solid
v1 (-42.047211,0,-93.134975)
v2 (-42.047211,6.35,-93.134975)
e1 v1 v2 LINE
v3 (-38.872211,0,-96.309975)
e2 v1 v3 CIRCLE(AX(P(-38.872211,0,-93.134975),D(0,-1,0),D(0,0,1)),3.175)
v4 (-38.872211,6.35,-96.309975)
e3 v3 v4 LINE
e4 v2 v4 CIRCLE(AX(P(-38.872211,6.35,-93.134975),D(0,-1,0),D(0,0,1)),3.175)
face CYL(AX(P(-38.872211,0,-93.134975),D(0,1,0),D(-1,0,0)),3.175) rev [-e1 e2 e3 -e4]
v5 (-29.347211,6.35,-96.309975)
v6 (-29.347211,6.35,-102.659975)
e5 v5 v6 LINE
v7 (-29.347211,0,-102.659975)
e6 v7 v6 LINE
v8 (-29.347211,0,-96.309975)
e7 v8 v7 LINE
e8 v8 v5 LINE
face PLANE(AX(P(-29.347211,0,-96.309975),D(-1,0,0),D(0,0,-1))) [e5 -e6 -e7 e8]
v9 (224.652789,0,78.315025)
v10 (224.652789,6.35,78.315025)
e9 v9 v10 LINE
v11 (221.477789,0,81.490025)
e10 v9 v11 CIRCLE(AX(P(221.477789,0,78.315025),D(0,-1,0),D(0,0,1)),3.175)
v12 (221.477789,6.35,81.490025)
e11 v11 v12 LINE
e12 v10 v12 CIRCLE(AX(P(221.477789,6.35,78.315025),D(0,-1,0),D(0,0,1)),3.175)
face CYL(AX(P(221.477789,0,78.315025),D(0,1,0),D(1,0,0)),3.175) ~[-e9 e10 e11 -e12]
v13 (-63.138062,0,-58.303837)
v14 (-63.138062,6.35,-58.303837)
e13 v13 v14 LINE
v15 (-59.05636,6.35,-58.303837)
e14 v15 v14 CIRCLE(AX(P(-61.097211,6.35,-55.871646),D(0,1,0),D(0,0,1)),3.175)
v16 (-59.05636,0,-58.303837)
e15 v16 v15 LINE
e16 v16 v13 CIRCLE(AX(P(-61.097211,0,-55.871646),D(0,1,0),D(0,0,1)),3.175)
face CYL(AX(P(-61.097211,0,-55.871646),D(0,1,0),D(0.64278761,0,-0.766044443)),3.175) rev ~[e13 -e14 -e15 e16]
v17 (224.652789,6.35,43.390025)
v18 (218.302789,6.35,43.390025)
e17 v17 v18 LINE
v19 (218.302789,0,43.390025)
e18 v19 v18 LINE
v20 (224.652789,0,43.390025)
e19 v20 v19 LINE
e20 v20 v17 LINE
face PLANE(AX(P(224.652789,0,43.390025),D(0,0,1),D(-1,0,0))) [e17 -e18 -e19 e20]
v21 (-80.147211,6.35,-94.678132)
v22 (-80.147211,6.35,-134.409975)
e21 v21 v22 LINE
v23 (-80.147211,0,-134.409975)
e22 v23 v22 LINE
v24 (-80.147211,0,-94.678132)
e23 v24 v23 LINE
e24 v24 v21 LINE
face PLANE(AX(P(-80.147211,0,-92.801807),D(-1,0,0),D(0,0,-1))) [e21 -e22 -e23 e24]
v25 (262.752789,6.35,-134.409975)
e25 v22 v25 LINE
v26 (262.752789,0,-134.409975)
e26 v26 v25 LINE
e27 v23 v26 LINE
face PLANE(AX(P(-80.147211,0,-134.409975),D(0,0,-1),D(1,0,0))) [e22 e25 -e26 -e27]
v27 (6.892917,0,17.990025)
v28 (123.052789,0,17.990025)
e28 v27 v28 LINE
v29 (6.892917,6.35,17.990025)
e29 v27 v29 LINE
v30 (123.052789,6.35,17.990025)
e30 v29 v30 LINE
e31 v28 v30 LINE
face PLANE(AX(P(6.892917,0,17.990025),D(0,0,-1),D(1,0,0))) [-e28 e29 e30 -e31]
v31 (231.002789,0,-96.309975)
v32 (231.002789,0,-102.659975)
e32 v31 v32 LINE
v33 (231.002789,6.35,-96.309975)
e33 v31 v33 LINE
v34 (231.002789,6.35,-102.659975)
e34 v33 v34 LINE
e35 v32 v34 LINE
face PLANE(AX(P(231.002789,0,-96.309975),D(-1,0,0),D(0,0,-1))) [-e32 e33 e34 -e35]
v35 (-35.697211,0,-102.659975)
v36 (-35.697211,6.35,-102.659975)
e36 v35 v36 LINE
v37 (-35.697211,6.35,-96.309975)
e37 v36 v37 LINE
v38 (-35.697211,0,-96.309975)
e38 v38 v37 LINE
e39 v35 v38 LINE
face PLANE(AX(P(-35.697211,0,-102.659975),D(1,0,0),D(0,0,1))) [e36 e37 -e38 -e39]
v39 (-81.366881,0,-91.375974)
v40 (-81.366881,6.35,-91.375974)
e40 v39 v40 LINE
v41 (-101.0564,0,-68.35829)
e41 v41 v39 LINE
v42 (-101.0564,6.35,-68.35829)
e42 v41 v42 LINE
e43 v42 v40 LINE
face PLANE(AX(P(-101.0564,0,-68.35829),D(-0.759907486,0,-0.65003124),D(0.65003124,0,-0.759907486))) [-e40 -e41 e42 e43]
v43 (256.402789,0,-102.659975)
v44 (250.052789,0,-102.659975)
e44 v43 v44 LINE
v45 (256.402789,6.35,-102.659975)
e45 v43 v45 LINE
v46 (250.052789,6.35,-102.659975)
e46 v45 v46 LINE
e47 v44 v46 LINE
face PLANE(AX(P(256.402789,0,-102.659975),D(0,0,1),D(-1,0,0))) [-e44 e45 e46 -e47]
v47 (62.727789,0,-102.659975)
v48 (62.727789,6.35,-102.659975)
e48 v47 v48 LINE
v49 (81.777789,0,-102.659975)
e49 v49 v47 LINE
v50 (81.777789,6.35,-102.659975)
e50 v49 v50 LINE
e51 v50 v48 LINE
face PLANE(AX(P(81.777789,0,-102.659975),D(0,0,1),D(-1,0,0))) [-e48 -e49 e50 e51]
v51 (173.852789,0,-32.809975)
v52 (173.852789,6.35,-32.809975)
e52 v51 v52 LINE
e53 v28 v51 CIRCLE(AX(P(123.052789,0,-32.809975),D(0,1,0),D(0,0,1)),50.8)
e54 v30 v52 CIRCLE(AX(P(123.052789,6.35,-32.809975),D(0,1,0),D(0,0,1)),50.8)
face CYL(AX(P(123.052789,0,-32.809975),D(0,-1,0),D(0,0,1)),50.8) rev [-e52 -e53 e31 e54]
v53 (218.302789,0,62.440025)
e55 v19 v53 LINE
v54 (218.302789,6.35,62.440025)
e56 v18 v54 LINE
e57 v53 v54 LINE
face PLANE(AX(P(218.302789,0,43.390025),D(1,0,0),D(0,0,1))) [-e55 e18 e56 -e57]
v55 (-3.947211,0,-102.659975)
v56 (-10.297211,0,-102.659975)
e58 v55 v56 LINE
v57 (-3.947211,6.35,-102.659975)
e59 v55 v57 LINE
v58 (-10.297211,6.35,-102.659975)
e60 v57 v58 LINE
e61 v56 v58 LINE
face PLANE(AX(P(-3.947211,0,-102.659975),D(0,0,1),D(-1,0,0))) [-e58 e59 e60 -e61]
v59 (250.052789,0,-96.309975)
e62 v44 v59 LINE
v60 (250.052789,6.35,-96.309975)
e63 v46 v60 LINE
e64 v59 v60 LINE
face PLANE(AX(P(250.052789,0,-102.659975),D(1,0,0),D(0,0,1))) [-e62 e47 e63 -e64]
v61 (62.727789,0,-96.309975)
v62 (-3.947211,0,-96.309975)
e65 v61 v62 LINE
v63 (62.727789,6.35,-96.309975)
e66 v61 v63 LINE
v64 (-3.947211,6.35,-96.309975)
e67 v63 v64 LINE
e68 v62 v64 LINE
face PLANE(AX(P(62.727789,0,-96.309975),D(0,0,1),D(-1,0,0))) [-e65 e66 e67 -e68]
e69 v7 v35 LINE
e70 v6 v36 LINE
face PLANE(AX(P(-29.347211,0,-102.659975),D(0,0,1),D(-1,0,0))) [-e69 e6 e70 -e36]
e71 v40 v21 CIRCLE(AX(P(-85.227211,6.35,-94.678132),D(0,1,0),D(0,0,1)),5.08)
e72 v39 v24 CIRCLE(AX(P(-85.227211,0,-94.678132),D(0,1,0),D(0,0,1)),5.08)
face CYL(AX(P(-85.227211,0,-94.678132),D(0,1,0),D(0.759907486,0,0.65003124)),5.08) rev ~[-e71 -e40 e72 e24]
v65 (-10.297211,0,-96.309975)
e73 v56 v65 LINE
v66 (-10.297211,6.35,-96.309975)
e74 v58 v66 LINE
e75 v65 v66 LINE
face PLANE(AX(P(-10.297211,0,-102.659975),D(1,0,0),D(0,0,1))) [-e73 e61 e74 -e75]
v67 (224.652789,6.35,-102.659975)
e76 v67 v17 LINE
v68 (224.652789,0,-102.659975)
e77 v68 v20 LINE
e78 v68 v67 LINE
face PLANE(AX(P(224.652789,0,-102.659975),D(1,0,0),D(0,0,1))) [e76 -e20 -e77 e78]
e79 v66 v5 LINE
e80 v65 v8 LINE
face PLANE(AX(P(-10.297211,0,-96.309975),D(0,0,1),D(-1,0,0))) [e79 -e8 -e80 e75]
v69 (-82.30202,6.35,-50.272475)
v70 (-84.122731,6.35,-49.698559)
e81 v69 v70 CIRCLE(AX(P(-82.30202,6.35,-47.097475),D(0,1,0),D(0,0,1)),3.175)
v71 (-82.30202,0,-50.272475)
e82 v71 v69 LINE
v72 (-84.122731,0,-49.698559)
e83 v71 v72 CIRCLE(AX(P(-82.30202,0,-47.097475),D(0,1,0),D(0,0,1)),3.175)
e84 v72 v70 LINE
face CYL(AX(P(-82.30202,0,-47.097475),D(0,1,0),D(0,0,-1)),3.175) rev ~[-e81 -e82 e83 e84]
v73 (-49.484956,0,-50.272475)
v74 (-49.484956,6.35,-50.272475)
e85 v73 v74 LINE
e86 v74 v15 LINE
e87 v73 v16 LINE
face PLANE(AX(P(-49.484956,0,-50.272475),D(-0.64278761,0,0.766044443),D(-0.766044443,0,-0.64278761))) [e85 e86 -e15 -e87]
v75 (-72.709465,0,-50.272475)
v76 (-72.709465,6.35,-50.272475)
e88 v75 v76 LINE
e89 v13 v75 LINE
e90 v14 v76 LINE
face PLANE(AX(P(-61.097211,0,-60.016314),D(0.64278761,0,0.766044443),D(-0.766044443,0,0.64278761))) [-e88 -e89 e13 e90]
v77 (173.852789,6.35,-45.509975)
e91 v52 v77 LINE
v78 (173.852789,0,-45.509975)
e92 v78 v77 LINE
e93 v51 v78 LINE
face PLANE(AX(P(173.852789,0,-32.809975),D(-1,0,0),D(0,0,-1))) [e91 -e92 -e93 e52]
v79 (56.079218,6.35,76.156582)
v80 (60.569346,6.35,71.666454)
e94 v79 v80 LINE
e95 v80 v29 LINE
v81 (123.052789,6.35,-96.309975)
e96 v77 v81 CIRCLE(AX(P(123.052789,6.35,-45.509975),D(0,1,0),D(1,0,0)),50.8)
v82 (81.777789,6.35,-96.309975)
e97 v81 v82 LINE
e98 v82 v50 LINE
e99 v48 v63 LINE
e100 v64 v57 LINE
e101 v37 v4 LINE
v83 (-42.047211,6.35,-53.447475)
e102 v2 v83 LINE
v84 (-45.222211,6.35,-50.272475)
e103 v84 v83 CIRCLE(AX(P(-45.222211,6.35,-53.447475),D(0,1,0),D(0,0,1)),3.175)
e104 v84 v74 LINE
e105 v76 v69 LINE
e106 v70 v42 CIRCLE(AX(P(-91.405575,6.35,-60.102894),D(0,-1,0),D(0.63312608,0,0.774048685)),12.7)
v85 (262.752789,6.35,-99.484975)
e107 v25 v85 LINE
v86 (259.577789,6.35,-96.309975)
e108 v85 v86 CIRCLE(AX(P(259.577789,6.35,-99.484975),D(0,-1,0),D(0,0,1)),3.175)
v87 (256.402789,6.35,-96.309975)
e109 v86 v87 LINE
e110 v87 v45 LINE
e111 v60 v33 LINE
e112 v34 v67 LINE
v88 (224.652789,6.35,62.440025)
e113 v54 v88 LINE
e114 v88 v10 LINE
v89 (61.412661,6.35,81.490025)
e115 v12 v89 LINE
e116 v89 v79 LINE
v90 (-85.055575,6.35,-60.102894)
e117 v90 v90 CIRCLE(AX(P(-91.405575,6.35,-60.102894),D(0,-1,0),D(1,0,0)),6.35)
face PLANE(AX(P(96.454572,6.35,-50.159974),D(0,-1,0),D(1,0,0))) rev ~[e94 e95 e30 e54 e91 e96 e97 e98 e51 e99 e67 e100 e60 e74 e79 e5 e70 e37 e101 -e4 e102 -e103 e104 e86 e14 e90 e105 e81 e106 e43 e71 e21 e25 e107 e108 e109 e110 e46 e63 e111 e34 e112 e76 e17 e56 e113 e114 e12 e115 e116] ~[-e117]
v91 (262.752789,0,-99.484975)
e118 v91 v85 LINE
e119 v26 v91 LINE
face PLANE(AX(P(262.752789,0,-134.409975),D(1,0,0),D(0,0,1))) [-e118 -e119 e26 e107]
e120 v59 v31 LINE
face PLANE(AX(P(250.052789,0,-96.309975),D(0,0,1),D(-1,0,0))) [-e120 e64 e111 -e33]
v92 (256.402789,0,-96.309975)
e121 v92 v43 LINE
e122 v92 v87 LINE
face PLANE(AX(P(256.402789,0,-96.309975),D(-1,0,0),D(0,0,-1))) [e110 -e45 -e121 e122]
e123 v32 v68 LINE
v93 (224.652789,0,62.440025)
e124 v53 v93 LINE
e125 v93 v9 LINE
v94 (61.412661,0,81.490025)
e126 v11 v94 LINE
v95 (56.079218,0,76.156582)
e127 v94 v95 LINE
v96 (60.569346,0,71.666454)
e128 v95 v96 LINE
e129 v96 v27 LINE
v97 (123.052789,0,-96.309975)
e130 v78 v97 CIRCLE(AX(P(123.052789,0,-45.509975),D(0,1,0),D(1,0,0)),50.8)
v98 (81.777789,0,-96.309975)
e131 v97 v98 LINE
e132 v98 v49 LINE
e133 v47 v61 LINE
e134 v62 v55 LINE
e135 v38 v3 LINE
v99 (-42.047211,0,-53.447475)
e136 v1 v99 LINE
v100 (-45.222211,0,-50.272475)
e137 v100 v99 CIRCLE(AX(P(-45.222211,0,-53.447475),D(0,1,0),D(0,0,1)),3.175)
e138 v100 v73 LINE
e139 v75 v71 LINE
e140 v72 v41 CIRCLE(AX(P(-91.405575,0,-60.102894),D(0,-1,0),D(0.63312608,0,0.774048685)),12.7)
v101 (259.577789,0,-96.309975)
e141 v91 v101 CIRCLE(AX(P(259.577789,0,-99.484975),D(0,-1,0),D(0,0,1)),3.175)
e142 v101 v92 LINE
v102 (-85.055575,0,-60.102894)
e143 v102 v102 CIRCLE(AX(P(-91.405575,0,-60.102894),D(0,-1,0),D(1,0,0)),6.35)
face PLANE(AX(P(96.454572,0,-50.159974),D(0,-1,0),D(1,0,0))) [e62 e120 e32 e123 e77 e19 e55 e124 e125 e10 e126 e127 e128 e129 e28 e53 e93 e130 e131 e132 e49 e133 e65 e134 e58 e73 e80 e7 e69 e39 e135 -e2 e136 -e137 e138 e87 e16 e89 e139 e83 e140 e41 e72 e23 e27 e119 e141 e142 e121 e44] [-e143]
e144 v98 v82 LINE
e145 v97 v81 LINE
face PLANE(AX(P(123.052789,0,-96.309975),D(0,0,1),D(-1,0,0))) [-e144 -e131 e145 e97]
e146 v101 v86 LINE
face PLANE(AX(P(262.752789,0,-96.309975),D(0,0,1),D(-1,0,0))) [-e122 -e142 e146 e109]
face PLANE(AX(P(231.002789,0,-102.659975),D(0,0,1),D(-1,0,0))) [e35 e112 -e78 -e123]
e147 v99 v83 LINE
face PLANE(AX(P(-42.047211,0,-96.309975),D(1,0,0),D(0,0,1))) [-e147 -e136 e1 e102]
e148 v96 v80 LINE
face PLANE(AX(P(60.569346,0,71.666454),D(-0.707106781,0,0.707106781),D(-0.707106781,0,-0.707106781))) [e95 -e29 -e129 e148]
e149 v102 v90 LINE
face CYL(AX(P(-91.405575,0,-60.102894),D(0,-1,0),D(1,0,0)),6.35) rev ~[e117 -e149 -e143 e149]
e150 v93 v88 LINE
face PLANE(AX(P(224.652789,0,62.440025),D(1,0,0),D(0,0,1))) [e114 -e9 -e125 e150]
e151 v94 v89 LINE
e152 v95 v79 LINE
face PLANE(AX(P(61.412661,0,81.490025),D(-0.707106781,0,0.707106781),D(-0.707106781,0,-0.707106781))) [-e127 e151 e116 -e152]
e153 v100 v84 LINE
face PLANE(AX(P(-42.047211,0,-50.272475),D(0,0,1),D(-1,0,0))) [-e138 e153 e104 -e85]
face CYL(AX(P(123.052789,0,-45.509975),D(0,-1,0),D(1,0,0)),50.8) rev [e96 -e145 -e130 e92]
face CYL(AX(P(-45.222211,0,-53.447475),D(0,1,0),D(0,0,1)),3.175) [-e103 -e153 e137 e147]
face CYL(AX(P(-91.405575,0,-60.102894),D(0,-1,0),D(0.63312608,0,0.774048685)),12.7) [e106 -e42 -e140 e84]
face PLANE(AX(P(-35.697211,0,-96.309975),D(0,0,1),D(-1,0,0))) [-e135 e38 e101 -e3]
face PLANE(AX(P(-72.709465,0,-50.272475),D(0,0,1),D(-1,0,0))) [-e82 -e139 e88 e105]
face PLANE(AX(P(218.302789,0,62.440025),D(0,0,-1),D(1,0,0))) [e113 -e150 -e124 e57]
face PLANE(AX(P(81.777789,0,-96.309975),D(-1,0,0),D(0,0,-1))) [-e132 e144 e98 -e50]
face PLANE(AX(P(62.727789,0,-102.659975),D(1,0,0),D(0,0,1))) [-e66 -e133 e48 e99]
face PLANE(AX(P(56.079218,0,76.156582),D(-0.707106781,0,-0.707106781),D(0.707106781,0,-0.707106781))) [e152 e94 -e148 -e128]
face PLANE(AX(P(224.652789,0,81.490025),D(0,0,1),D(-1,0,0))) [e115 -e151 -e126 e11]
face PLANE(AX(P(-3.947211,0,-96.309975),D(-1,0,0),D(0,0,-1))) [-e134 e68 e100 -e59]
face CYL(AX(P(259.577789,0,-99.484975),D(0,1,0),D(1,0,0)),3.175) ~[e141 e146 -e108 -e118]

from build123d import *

# Parameters (mm, degrees)
F0_R     = 6.35
F1_DEPTH = 6.35
F2_R     = 3.175
F3_R     = 5.08
F4_R     = 3.175
F5_R     = 3.175


# Not quite as in the source:
# - ends of sketch curves that miss each other by under 0.0002 mm in the source are joined


with BuildPart() as f1:
    # F0 (on Front) → F1 (new body)
    with BuildSketch(Plane.XZ):
        with BuildLine():
            Line((-72.7094654823, -50.272475262), (-83.3648741359, -50.272475262))
            ThreePointArc((-83.3648741359, -50.272475262), (-100.4842470659, -51.222143603), (-101.056400417, -68.3582903151))
            Line((-101.056400417, -68.3582903151), (-80.147210941, -92.8018072064))
            Line((-80.147210941, -92.8018072064), (-80.147210941, -134.409975262))
            Line((-80.147210941, -134.409975262), (262.752789059, -134.409975262))
            Line((262.752789059, -134.409975262), (262.752789059, -96.309975262))
            Line((262.752789059, -96.309975262), (256.402789059, -96.309975262))
            Line((256.402789059, -96.309975262), (256.402789059, -102.659975262))
            Line((256.402789059, -102.659975262), (250.052789059, -102.659975262))
            Line((250.052789059, -102.659975262), (250.052789059, -96.309975262))
            Line((250.052789059, -96.309975262), (231.002789059, -96.309975262))
            Line((231.002789059, -96.309975262), (231.002789059, -102.659975262))
            Line((231.002789059, -102.659975262), (224.652789059, -102.659975262))
            Line((224.652789059, -102.659975262), (224.652789059, 43.390024738))
            Line((224.652789059, 43.390024738), (218.302789059, 43.390024738))
            Line((218.302789059, 43.390024738), (218.302789059, 62.440024738))
            Line((218.302789059, 62.440024738), (224.652789059, 62.440024738))
            Line((224.652789059, 62.440024738), (224.652789059, 81.490024738))
            Line((224.652789059, 81.490024738), (61.4126609984, 81.490024738))
            Line((61.4126609984, 81.490024738), (56.0792184251, 76.1565821646))
            Line((56.0792184251, 76.1565821646), (60.5693464856, 71.6664541041))
            Line((60.5693464856, 71.6664541041), (6.8929171195, 17.990024738))
            Line((6.8929171195, 17.990024738), (123.052789059, 17.990024738))
            ThreePointArc((123.052789059, 17.990024738), (158.9738135432, 3.1110492223), (173.852789059, -32.809975262))
            Line((173.852789059, -32.809975262), (173.852789059, -45.509975262))
            ThreePointArc((173.852789059, -45.509975262), (158.9738135432, -81.4309997463), (123.052789059, -96.309975262))
            Line((123.052789059, -96.309975262), (81.777789059, -96.309975262))
            Line((81.777789059, -96.309975262), (81.777789059, -102.659975262))
            Line((81.777789059, -102.659975262), (62.727789059, -102.659975262))
            Line((62.727789059, -102.659975262), (62.727789059, -96.309975262))
            Line((62.727789059, -96.309975262), (-3.947210941, -96.309975262))
            Line((-3.947210941, -96.309975262), (-3.947210941, -102.659975262))
            Line((-3.947210941, -102.659975262), (-10.297210941, -102.659975262))
            Line((-10.297210941, -102.659975262), (-10.297210941, -96.309975262))
            Line((-10.297210941, -96.309975262), (-29.347210941, -96.309975262))
            Line((-29.347210941, -96.309975262), (-29.347210941, -102.659975262))
            Line((-29.347210941, -102.659975262), (-35.697210941, -102.659975262))
            Line((-35.697210941, -102.659975262), (-35.697210941, -96.309975262))
            Line((-35.697210941, -96.309975262), (-42.047210941, -96.309975262))
            Line((-42.047210941, -96.309975262), (-42.047210941, -50.272475262))
            Line((-42.047210941, -50.272475262), (-49.4849563998, -50.272475262))
            Line((-49.4849563998, -50.272475262), (-61.097210941, -60.0163137647))
            Line((-61.097210941, -60.0163137647), (-72.7094654823, -50.272475262))
        make_face()
        with Locations((-91.4055753496, -60.1028935639)):
            Circle(F0_R, mode=Mode.SUBTRACT)
    extrude(amount=-F1_DEPTH)

    # F2
    f2_edges = [f1.edges().sort_by_distance(p)[0] for p in [
        (224.652789, 3.175, 81.490025),
        (-42.047211, 3.175, -96.309975),
    ]]
    fillet(f2_edges, radius=F2_R)

    # F3
    f3_edges = [f1.edges().sort_by_distance(p)[0] for p in [
        (-80.147211, 3.175, -92.801807),
    ]]
    fillet(f3_edges, radius=F3_R)

    # F4
    f4_edges = [f1.edges().sort_by_distance(p)[0] for p in [
        (-42.047211, 3.175, -50.272475),
    ]]
    fillet(f4_edges, radius=F4_R)

    # F5
    f5_edges = [f1.edges().sort_by_distance(p)[0] for p in [
        (-61.097211, 3.175, -60.016314),
        (-83.364874, 3.175, -50.272475),
        (262.752789, 3.175, -96.309975),
    ]]
    fillet(f5_edges, radius=F5_R)


solid = f1.part
